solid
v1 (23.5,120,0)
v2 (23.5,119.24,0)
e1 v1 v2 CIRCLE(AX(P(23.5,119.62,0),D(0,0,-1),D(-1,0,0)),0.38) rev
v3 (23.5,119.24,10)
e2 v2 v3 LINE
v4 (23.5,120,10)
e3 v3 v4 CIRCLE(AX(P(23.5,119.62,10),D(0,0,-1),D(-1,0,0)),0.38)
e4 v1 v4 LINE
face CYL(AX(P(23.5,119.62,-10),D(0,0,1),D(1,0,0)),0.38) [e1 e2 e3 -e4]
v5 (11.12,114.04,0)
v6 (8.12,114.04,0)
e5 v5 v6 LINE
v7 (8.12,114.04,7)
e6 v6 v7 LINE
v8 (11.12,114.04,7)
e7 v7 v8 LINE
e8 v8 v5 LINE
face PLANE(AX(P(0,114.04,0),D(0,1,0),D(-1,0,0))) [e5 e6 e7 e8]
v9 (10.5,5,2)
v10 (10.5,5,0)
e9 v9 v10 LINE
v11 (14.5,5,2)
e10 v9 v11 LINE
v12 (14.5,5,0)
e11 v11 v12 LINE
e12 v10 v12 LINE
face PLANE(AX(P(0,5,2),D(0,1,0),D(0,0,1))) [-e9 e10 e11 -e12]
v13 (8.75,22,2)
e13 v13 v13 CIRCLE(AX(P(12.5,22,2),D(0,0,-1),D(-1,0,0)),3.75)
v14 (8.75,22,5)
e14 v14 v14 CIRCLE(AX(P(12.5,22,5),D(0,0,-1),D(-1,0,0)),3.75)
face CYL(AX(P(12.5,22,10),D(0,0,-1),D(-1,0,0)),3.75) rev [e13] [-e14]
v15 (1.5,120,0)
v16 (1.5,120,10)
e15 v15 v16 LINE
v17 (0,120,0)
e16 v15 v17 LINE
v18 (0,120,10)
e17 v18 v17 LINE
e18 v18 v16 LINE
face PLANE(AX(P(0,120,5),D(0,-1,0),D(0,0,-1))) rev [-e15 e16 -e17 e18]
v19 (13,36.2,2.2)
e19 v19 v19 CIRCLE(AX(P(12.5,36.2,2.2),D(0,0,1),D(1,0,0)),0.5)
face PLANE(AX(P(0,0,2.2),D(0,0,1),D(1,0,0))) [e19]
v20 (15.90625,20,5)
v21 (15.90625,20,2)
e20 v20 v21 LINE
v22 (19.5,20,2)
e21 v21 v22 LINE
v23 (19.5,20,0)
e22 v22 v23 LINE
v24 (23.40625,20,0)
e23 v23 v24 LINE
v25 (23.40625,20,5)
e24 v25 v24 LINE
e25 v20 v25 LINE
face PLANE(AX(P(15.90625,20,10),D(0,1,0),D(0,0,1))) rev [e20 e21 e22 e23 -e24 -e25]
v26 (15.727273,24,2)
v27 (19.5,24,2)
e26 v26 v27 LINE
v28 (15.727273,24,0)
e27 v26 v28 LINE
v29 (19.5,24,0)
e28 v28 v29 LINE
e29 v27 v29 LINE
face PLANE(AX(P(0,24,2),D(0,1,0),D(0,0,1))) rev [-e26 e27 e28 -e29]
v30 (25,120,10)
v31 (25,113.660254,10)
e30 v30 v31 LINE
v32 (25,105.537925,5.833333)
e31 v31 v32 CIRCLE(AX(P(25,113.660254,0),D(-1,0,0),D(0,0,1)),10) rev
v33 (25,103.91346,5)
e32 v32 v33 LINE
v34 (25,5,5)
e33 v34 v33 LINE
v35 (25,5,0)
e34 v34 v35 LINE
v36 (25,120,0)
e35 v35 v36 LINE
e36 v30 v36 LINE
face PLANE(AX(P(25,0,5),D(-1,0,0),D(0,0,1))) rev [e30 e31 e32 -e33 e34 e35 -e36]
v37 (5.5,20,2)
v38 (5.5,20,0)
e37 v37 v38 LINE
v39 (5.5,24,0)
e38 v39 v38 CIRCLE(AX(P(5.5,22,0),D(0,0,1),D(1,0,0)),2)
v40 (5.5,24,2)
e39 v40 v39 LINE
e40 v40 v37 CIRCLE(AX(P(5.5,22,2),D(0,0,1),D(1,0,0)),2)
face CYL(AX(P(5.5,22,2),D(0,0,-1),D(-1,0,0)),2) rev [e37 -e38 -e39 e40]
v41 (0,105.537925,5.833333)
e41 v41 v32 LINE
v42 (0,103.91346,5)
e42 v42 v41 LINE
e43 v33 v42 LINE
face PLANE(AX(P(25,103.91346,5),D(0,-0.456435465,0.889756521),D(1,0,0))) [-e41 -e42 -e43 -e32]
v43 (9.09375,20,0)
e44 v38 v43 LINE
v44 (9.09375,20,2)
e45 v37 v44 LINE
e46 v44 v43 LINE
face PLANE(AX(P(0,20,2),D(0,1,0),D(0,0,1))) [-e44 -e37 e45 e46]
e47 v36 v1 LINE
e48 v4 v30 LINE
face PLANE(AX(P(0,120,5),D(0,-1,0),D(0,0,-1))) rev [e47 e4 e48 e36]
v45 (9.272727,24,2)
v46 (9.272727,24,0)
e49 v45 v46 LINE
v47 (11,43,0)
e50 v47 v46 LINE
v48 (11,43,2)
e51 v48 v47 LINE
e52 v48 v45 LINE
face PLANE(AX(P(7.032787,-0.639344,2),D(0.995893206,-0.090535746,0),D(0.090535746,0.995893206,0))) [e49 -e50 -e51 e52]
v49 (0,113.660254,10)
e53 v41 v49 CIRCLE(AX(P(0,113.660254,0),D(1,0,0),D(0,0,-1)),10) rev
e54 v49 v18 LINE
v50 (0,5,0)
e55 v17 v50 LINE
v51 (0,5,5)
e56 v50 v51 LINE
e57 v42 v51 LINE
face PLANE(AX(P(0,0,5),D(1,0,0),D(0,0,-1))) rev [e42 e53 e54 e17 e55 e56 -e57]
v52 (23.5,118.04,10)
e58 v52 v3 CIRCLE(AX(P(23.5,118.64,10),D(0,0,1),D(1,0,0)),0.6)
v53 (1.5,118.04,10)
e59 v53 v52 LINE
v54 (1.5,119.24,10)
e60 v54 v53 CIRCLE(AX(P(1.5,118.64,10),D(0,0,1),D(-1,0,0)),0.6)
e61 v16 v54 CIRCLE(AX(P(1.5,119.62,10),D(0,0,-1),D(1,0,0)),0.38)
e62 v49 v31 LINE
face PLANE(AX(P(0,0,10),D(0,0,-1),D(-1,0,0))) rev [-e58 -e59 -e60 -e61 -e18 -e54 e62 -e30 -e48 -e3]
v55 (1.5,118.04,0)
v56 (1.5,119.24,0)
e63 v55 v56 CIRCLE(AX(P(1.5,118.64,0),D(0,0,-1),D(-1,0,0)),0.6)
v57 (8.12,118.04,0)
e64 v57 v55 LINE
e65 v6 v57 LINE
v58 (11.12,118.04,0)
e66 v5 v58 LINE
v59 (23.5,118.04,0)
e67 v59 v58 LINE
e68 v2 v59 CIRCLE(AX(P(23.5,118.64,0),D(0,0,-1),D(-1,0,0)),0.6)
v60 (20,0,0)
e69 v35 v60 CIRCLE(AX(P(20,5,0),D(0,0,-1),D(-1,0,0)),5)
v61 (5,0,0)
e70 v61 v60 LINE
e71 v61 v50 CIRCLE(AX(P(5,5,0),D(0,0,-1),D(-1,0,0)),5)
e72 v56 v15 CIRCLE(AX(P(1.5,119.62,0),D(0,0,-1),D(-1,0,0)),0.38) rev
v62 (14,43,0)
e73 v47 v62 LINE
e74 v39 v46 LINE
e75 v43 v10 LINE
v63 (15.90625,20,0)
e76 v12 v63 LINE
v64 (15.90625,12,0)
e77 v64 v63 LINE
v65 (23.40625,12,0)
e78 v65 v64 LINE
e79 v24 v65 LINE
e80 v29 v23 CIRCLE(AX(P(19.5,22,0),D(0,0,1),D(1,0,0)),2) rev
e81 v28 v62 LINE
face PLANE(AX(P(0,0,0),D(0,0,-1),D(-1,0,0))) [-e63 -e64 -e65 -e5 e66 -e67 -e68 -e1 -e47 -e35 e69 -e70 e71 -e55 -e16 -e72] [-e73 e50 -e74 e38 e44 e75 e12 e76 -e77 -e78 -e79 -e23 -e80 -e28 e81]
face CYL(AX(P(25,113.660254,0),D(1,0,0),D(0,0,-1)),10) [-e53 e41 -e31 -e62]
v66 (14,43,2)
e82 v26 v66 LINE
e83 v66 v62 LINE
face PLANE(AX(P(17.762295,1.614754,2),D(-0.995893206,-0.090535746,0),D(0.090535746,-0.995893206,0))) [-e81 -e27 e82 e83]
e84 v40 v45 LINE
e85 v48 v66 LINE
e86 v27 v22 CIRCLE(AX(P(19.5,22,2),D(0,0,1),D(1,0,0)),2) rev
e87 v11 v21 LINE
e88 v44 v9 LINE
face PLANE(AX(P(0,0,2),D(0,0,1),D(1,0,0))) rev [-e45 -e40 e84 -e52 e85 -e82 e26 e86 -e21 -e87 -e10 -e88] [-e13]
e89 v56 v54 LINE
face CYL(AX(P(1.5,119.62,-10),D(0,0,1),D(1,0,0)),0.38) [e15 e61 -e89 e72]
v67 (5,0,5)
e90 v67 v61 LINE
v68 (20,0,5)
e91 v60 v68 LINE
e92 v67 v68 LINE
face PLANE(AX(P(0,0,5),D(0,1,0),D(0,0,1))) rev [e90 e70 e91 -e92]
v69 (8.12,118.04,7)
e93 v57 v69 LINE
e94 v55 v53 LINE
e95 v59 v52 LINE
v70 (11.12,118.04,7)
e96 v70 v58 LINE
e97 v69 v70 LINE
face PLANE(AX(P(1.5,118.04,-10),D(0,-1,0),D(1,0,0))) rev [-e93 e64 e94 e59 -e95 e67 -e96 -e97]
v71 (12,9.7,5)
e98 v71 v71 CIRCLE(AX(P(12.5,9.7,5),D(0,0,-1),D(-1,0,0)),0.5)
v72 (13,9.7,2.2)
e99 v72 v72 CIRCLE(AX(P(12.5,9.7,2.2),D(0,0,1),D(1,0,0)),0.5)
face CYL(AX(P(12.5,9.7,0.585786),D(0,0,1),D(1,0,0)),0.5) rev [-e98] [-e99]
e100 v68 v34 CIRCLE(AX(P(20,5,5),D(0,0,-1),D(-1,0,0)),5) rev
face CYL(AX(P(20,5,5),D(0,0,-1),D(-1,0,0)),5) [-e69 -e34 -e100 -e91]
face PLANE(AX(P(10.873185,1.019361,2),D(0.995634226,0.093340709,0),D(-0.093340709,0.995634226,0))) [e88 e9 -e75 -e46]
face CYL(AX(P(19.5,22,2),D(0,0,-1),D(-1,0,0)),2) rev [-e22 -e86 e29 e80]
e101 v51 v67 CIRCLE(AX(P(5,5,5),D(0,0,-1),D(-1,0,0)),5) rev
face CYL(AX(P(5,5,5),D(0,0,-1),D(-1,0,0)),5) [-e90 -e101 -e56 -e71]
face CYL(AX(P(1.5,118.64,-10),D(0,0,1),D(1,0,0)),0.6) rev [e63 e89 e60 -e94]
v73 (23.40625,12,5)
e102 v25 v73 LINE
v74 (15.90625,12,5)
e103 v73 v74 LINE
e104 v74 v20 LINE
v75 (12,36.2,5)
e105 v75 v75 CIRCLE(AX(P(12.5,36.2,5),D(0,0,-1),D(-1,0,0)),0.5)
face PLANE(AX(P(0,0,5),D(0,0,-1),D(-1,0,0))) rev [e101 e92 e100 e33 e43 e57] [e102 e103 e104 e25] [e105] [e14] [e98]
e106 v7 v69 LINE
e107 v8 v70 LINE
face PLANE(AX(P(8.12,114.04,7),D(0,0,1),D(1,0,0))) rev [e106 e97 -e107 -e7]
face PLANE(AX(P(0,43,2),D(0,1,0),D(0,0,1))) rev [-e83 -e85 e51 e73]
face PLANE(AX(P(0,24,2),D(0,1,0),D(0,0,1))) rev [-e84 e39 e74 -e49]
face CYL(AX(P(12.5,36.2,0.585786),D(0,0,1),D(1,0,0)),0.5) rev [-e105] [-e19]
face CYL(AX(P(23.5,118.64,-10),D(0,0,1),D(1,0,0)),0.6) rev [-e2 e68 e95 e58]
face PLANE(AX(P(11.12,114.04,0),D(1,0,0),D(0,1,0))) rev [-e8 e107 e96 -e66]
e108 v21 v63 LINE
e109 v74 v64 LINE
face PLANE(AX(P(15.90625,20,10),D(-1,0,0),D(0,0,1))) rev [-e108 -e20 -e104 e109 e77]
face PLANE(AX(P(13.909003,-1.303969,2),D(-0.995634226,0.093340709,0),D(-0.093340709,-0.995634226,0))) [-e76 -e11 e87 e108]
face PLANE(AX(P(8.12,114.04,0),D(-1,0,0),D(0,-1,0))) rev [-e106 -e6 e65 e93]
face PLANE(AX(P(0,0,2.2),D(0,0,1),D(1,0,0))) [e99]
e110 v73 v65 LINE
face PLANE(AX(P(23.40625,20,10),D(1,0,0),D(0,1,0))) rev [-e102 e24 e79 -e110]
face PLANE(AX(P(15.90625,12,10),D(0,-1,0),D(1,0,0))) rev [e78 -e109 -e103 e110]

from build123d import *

# Parameters (mm, degrees)
SKICA1_W                 = 25
SKICA1_H                 = 120
P_IDAT_VYSUNUT_M1_DEPTH  = 5
SKICA2_W                 = 25
SKICA2_H                 = 15
P_IDAT_VYSUNUT_M2_DEPTH  = 10
ZAOBLIT5_R               = 5
ZAOBLIT6_R               = 5
ODEBRAT_VYSUNUT_M2_DEPTH = 20
ZAOBLIT7_R               = 10
SKICA4_W                 = 3
SKICA4_H                 = 7
ODEBRAT_VYSUNUT_M3_DEPTH = 4
ODEBRAT_VYSUNUT_M4_DEPTH = 2
ODEBRAT_START            = -3
SKICA7_R                 = 0.5
ODEBRAT_VYSUNUT_M5_DEPTH = 2.8
SKICA8_R                 = 3.75
ODEBRAT_VYSUNUT_M6_DEPTH = 123.837290755
SKICA9_W                 = 7.5
SKICA9_H                 = 8
ODEBRAT_VYSUNUT_M7_DEPTH = 123.983738762


with BuildPart() as part:
    # Skica1 → Přidat vysunutím1 (new body)
    with BuildSketch(Plane.XY):
        with Locations((12.5, 60)):
            Rectangle(SKICA1_W, SKICA1_H)
    extrude(amount=P_IDAT_VYSUNUT_M1_DEPTH)

    # Skica2 → Přidat vysunutím2 (add)
    with BuildSketch(Plane(origin=(0, 0, 0), x_dir=(-1, 0, 0), z_dir=(0, 0, -1))):
        with Locations((-12.5, 112.5)):
            Rectangle(SKICA2_W, SKICA2_H)
    extrude(amount=-P_IDAT_VYSUNUT_M2_DEPTH)

    # Zaoblit5
    zaoblit5_edges = [part.edges().sort_by_distance(p)[0] for p in [
        (25, 0, 2.5),
    ]]
    fillet(zaoblit5_edges, radius=ZAOBLIT5_R)

    # Zaoblit6
    zaoblit6_edges = [part.edges().sort_by_distance(p)[0] for p in [
        (0, 0, 2.5),
    ]]
    fillet(zaoblit6_edges, radius=ZAOBLIT6_R)

    # Skica3 → Odebrat vysunutím2 (cut)
    with BuildSketch(Plane.XY.offset(10)):
        with BuildLine():
            Line((1.5, 118.04), (23.5, 118.04))
            ThreePointArc((23.5, 118.04), (24.1, 118.64), (23.5, 119.24))
            ThreePointArc((23.5, 119.24), (23.12, 119.62), (23.5, 120))
            Line((23.5, 120), (1.5, 120))
            ThreePointArc((1.5, 120), (1.88, 119.62), (1.5, 119.24))
            ThreePointArc((1.5, 119.24), (0.9, 118.64), (1.5, 118.04))
        make_face()
    extrude(amount=-ODEBRAT_VYSUNUT_M2_DEPTH, mode=Mode.SUBTRACT)

    # Zaoblit7
    # the kernel refuses this fillet: 10 mm, written as the material it takes off along each edge
    with BuildSketch(Plane(origin=(-21.650635095, 105, 10), x_dir=(0, 0, -1), z_dir=(1, 0, 0))) as zaoblit7_piece_1:
        with BuildLine():
            CenterArc((10, 8.660254038), ZAOBLIT7_R, 180, 60)
            Line((0, 8.660254038), (-0.2, 8.660254038))
            Line((-0.2, 8.660254038), (-0.2, 0))
            Line((-0.2, 0), (0, -0.2))
            ThreePointArc((0, -0.2), (2.5, -0.2), (4.9, -0.173205081))
            Line((4.9, -0.173205081), (5, 0))
        make_face()
    extrude(amount=68.301270189, mode=Mode.SUBTRACT)

    # Zaoblit8
    # the kernel refuses this chamfer: 2 mm, written as the material it adds along each edge
    with BuildSketch(Plane(origin=(25, 105, 5), x_dir=(0, -0.9995029762160257, -0.031524602064212835), z_dir=(-1, 0, 0))) as zaoblit8_piece_1:
        with BuildLine():
            Line((1.15829653, 0), (-0.636224816, 0.850214013))
            Line((-0.636224816, 0.850214013), (-0.667962409, 0.825868064))
            ThreePointArc((-0.667962409, 0.825868064), (-0.324476703, 0.420675743), (-0.033993307, -0.021082104))
            Line((-0.033993307, -0.021082104), (0.001260984, -0.039980119))
            ThreePointArc((0.001260984, -0.039980119), (0.579833691, -0.021731775), (1.159557514, -0.039980119))
            Line((1.159557514, -0.039980119), (1.15829653, 0))
        make_face()
    extrude(amount=25)

    # Skica4 → Odebrat vysunutím3 (cut)
    with BuildSketch(Plane(origin=(0, 118.04, 0), x_dir=(1, 0, 0), z_dir=(0, 1, 0))):
        with Locations((9.62, -3.5)):
            Rectangle(SKICA4_W, SKICA4_H)
    extrude(amount=-ODEBRAT_VYSUNUT_M3_DEPTH, mode=Mode.SUBTRACT)

    # Skica5 → Odebrat vysunutím4 (cut)
    with BuildSketch(Plane.XY):
        Polygon((11, 43), (9.272727273, 24), (15.727272727, 24), (14, 43), align=None)
        with BuildLine():
            Line((5.5, 24), (5.5, 20))
            ThreePointArc((5.5, 20), (3.5, 22), (5.5, 24))
        make_face()
        Polygon((9.09375, 20), (9, 21), (9.272727273, 24), (5.5, 24), (5.5, 20), align=None)
        Polygon((9.272727273, 24), (9, 21), (16, 21), (15.727272727, 24), align=None)
        Polygon((16, 21), (9, 21), (9.09375, 20), (15.90625, 20), align=None)
        Polygon((15.727272727, 24), (16, 21), (15.90625, 20), (19.5, 20), (19.5, 24), align=None)
        with BuildLine():
            ThreePointArc((19.5, 24), (21.5, 22), (19.5, 20))
            Line((19.5, 20), (19.5, 24))
        make_face()
        Polygon((15.90625, 20), (9.09375, 20), (10.5, 5), (14.5, 5), align=None)
    extrude(amount=ODEBRAT_VYSUNUT_M4_DEPTH, mode=Mode.SUBTRACT)

    # Skica7 → Odebrat vysunutím5 (cut)
    with BuildSketch(Plane(origin=(0, 0, 2), x_dir=(-1, 0, 0), z_dir=(0, 0, -1)).offset(ODEBRAT_START)):
        with Locations(Location((-12.5, 36.2, 0), (0, 0, 180))):
            Circle(SKICA7_R)
        with Locations(Location((-12.5, 9.7, 0), (0, 0, 180))):
            Circle(SKICA7_R)
    extrude(amount=ODEBRAT_VYSUNUT_M5_DEPTH, mode=Mode.SUBTRACT)

    # Skica8 → Odebrat vysunutím6 (cut, through all)
    with BuildSketch(Plane(origin=(0, 0, 2), x_dir=(-1, 0, 0), z_dir=(0, 0, -1))):
        with Locations((-12.5, 22)):
            Circle(SKICA8_R)
    extrude(amount=-ODEBRAT_VYSUNUT_M6_DEPTH, mode=Mode.SUBTRACT)

    # Skica9 → Odebrat vysunutím7 (cut, through all)
    with BuildSketch(Plane(origin=(0, 0, 0), x_dir=(-1, 0, 0), z_dir=(0, 0, -1))):
        with Locations((-19.65625, 16)):
            Rectangle(SKICA9_W, SKICA9_H)
    extrude(amount=-ODEBRAT_VYSUNUT_M7_DEPTH, mode=Mode.SUBTRACT)


solid = part.part
